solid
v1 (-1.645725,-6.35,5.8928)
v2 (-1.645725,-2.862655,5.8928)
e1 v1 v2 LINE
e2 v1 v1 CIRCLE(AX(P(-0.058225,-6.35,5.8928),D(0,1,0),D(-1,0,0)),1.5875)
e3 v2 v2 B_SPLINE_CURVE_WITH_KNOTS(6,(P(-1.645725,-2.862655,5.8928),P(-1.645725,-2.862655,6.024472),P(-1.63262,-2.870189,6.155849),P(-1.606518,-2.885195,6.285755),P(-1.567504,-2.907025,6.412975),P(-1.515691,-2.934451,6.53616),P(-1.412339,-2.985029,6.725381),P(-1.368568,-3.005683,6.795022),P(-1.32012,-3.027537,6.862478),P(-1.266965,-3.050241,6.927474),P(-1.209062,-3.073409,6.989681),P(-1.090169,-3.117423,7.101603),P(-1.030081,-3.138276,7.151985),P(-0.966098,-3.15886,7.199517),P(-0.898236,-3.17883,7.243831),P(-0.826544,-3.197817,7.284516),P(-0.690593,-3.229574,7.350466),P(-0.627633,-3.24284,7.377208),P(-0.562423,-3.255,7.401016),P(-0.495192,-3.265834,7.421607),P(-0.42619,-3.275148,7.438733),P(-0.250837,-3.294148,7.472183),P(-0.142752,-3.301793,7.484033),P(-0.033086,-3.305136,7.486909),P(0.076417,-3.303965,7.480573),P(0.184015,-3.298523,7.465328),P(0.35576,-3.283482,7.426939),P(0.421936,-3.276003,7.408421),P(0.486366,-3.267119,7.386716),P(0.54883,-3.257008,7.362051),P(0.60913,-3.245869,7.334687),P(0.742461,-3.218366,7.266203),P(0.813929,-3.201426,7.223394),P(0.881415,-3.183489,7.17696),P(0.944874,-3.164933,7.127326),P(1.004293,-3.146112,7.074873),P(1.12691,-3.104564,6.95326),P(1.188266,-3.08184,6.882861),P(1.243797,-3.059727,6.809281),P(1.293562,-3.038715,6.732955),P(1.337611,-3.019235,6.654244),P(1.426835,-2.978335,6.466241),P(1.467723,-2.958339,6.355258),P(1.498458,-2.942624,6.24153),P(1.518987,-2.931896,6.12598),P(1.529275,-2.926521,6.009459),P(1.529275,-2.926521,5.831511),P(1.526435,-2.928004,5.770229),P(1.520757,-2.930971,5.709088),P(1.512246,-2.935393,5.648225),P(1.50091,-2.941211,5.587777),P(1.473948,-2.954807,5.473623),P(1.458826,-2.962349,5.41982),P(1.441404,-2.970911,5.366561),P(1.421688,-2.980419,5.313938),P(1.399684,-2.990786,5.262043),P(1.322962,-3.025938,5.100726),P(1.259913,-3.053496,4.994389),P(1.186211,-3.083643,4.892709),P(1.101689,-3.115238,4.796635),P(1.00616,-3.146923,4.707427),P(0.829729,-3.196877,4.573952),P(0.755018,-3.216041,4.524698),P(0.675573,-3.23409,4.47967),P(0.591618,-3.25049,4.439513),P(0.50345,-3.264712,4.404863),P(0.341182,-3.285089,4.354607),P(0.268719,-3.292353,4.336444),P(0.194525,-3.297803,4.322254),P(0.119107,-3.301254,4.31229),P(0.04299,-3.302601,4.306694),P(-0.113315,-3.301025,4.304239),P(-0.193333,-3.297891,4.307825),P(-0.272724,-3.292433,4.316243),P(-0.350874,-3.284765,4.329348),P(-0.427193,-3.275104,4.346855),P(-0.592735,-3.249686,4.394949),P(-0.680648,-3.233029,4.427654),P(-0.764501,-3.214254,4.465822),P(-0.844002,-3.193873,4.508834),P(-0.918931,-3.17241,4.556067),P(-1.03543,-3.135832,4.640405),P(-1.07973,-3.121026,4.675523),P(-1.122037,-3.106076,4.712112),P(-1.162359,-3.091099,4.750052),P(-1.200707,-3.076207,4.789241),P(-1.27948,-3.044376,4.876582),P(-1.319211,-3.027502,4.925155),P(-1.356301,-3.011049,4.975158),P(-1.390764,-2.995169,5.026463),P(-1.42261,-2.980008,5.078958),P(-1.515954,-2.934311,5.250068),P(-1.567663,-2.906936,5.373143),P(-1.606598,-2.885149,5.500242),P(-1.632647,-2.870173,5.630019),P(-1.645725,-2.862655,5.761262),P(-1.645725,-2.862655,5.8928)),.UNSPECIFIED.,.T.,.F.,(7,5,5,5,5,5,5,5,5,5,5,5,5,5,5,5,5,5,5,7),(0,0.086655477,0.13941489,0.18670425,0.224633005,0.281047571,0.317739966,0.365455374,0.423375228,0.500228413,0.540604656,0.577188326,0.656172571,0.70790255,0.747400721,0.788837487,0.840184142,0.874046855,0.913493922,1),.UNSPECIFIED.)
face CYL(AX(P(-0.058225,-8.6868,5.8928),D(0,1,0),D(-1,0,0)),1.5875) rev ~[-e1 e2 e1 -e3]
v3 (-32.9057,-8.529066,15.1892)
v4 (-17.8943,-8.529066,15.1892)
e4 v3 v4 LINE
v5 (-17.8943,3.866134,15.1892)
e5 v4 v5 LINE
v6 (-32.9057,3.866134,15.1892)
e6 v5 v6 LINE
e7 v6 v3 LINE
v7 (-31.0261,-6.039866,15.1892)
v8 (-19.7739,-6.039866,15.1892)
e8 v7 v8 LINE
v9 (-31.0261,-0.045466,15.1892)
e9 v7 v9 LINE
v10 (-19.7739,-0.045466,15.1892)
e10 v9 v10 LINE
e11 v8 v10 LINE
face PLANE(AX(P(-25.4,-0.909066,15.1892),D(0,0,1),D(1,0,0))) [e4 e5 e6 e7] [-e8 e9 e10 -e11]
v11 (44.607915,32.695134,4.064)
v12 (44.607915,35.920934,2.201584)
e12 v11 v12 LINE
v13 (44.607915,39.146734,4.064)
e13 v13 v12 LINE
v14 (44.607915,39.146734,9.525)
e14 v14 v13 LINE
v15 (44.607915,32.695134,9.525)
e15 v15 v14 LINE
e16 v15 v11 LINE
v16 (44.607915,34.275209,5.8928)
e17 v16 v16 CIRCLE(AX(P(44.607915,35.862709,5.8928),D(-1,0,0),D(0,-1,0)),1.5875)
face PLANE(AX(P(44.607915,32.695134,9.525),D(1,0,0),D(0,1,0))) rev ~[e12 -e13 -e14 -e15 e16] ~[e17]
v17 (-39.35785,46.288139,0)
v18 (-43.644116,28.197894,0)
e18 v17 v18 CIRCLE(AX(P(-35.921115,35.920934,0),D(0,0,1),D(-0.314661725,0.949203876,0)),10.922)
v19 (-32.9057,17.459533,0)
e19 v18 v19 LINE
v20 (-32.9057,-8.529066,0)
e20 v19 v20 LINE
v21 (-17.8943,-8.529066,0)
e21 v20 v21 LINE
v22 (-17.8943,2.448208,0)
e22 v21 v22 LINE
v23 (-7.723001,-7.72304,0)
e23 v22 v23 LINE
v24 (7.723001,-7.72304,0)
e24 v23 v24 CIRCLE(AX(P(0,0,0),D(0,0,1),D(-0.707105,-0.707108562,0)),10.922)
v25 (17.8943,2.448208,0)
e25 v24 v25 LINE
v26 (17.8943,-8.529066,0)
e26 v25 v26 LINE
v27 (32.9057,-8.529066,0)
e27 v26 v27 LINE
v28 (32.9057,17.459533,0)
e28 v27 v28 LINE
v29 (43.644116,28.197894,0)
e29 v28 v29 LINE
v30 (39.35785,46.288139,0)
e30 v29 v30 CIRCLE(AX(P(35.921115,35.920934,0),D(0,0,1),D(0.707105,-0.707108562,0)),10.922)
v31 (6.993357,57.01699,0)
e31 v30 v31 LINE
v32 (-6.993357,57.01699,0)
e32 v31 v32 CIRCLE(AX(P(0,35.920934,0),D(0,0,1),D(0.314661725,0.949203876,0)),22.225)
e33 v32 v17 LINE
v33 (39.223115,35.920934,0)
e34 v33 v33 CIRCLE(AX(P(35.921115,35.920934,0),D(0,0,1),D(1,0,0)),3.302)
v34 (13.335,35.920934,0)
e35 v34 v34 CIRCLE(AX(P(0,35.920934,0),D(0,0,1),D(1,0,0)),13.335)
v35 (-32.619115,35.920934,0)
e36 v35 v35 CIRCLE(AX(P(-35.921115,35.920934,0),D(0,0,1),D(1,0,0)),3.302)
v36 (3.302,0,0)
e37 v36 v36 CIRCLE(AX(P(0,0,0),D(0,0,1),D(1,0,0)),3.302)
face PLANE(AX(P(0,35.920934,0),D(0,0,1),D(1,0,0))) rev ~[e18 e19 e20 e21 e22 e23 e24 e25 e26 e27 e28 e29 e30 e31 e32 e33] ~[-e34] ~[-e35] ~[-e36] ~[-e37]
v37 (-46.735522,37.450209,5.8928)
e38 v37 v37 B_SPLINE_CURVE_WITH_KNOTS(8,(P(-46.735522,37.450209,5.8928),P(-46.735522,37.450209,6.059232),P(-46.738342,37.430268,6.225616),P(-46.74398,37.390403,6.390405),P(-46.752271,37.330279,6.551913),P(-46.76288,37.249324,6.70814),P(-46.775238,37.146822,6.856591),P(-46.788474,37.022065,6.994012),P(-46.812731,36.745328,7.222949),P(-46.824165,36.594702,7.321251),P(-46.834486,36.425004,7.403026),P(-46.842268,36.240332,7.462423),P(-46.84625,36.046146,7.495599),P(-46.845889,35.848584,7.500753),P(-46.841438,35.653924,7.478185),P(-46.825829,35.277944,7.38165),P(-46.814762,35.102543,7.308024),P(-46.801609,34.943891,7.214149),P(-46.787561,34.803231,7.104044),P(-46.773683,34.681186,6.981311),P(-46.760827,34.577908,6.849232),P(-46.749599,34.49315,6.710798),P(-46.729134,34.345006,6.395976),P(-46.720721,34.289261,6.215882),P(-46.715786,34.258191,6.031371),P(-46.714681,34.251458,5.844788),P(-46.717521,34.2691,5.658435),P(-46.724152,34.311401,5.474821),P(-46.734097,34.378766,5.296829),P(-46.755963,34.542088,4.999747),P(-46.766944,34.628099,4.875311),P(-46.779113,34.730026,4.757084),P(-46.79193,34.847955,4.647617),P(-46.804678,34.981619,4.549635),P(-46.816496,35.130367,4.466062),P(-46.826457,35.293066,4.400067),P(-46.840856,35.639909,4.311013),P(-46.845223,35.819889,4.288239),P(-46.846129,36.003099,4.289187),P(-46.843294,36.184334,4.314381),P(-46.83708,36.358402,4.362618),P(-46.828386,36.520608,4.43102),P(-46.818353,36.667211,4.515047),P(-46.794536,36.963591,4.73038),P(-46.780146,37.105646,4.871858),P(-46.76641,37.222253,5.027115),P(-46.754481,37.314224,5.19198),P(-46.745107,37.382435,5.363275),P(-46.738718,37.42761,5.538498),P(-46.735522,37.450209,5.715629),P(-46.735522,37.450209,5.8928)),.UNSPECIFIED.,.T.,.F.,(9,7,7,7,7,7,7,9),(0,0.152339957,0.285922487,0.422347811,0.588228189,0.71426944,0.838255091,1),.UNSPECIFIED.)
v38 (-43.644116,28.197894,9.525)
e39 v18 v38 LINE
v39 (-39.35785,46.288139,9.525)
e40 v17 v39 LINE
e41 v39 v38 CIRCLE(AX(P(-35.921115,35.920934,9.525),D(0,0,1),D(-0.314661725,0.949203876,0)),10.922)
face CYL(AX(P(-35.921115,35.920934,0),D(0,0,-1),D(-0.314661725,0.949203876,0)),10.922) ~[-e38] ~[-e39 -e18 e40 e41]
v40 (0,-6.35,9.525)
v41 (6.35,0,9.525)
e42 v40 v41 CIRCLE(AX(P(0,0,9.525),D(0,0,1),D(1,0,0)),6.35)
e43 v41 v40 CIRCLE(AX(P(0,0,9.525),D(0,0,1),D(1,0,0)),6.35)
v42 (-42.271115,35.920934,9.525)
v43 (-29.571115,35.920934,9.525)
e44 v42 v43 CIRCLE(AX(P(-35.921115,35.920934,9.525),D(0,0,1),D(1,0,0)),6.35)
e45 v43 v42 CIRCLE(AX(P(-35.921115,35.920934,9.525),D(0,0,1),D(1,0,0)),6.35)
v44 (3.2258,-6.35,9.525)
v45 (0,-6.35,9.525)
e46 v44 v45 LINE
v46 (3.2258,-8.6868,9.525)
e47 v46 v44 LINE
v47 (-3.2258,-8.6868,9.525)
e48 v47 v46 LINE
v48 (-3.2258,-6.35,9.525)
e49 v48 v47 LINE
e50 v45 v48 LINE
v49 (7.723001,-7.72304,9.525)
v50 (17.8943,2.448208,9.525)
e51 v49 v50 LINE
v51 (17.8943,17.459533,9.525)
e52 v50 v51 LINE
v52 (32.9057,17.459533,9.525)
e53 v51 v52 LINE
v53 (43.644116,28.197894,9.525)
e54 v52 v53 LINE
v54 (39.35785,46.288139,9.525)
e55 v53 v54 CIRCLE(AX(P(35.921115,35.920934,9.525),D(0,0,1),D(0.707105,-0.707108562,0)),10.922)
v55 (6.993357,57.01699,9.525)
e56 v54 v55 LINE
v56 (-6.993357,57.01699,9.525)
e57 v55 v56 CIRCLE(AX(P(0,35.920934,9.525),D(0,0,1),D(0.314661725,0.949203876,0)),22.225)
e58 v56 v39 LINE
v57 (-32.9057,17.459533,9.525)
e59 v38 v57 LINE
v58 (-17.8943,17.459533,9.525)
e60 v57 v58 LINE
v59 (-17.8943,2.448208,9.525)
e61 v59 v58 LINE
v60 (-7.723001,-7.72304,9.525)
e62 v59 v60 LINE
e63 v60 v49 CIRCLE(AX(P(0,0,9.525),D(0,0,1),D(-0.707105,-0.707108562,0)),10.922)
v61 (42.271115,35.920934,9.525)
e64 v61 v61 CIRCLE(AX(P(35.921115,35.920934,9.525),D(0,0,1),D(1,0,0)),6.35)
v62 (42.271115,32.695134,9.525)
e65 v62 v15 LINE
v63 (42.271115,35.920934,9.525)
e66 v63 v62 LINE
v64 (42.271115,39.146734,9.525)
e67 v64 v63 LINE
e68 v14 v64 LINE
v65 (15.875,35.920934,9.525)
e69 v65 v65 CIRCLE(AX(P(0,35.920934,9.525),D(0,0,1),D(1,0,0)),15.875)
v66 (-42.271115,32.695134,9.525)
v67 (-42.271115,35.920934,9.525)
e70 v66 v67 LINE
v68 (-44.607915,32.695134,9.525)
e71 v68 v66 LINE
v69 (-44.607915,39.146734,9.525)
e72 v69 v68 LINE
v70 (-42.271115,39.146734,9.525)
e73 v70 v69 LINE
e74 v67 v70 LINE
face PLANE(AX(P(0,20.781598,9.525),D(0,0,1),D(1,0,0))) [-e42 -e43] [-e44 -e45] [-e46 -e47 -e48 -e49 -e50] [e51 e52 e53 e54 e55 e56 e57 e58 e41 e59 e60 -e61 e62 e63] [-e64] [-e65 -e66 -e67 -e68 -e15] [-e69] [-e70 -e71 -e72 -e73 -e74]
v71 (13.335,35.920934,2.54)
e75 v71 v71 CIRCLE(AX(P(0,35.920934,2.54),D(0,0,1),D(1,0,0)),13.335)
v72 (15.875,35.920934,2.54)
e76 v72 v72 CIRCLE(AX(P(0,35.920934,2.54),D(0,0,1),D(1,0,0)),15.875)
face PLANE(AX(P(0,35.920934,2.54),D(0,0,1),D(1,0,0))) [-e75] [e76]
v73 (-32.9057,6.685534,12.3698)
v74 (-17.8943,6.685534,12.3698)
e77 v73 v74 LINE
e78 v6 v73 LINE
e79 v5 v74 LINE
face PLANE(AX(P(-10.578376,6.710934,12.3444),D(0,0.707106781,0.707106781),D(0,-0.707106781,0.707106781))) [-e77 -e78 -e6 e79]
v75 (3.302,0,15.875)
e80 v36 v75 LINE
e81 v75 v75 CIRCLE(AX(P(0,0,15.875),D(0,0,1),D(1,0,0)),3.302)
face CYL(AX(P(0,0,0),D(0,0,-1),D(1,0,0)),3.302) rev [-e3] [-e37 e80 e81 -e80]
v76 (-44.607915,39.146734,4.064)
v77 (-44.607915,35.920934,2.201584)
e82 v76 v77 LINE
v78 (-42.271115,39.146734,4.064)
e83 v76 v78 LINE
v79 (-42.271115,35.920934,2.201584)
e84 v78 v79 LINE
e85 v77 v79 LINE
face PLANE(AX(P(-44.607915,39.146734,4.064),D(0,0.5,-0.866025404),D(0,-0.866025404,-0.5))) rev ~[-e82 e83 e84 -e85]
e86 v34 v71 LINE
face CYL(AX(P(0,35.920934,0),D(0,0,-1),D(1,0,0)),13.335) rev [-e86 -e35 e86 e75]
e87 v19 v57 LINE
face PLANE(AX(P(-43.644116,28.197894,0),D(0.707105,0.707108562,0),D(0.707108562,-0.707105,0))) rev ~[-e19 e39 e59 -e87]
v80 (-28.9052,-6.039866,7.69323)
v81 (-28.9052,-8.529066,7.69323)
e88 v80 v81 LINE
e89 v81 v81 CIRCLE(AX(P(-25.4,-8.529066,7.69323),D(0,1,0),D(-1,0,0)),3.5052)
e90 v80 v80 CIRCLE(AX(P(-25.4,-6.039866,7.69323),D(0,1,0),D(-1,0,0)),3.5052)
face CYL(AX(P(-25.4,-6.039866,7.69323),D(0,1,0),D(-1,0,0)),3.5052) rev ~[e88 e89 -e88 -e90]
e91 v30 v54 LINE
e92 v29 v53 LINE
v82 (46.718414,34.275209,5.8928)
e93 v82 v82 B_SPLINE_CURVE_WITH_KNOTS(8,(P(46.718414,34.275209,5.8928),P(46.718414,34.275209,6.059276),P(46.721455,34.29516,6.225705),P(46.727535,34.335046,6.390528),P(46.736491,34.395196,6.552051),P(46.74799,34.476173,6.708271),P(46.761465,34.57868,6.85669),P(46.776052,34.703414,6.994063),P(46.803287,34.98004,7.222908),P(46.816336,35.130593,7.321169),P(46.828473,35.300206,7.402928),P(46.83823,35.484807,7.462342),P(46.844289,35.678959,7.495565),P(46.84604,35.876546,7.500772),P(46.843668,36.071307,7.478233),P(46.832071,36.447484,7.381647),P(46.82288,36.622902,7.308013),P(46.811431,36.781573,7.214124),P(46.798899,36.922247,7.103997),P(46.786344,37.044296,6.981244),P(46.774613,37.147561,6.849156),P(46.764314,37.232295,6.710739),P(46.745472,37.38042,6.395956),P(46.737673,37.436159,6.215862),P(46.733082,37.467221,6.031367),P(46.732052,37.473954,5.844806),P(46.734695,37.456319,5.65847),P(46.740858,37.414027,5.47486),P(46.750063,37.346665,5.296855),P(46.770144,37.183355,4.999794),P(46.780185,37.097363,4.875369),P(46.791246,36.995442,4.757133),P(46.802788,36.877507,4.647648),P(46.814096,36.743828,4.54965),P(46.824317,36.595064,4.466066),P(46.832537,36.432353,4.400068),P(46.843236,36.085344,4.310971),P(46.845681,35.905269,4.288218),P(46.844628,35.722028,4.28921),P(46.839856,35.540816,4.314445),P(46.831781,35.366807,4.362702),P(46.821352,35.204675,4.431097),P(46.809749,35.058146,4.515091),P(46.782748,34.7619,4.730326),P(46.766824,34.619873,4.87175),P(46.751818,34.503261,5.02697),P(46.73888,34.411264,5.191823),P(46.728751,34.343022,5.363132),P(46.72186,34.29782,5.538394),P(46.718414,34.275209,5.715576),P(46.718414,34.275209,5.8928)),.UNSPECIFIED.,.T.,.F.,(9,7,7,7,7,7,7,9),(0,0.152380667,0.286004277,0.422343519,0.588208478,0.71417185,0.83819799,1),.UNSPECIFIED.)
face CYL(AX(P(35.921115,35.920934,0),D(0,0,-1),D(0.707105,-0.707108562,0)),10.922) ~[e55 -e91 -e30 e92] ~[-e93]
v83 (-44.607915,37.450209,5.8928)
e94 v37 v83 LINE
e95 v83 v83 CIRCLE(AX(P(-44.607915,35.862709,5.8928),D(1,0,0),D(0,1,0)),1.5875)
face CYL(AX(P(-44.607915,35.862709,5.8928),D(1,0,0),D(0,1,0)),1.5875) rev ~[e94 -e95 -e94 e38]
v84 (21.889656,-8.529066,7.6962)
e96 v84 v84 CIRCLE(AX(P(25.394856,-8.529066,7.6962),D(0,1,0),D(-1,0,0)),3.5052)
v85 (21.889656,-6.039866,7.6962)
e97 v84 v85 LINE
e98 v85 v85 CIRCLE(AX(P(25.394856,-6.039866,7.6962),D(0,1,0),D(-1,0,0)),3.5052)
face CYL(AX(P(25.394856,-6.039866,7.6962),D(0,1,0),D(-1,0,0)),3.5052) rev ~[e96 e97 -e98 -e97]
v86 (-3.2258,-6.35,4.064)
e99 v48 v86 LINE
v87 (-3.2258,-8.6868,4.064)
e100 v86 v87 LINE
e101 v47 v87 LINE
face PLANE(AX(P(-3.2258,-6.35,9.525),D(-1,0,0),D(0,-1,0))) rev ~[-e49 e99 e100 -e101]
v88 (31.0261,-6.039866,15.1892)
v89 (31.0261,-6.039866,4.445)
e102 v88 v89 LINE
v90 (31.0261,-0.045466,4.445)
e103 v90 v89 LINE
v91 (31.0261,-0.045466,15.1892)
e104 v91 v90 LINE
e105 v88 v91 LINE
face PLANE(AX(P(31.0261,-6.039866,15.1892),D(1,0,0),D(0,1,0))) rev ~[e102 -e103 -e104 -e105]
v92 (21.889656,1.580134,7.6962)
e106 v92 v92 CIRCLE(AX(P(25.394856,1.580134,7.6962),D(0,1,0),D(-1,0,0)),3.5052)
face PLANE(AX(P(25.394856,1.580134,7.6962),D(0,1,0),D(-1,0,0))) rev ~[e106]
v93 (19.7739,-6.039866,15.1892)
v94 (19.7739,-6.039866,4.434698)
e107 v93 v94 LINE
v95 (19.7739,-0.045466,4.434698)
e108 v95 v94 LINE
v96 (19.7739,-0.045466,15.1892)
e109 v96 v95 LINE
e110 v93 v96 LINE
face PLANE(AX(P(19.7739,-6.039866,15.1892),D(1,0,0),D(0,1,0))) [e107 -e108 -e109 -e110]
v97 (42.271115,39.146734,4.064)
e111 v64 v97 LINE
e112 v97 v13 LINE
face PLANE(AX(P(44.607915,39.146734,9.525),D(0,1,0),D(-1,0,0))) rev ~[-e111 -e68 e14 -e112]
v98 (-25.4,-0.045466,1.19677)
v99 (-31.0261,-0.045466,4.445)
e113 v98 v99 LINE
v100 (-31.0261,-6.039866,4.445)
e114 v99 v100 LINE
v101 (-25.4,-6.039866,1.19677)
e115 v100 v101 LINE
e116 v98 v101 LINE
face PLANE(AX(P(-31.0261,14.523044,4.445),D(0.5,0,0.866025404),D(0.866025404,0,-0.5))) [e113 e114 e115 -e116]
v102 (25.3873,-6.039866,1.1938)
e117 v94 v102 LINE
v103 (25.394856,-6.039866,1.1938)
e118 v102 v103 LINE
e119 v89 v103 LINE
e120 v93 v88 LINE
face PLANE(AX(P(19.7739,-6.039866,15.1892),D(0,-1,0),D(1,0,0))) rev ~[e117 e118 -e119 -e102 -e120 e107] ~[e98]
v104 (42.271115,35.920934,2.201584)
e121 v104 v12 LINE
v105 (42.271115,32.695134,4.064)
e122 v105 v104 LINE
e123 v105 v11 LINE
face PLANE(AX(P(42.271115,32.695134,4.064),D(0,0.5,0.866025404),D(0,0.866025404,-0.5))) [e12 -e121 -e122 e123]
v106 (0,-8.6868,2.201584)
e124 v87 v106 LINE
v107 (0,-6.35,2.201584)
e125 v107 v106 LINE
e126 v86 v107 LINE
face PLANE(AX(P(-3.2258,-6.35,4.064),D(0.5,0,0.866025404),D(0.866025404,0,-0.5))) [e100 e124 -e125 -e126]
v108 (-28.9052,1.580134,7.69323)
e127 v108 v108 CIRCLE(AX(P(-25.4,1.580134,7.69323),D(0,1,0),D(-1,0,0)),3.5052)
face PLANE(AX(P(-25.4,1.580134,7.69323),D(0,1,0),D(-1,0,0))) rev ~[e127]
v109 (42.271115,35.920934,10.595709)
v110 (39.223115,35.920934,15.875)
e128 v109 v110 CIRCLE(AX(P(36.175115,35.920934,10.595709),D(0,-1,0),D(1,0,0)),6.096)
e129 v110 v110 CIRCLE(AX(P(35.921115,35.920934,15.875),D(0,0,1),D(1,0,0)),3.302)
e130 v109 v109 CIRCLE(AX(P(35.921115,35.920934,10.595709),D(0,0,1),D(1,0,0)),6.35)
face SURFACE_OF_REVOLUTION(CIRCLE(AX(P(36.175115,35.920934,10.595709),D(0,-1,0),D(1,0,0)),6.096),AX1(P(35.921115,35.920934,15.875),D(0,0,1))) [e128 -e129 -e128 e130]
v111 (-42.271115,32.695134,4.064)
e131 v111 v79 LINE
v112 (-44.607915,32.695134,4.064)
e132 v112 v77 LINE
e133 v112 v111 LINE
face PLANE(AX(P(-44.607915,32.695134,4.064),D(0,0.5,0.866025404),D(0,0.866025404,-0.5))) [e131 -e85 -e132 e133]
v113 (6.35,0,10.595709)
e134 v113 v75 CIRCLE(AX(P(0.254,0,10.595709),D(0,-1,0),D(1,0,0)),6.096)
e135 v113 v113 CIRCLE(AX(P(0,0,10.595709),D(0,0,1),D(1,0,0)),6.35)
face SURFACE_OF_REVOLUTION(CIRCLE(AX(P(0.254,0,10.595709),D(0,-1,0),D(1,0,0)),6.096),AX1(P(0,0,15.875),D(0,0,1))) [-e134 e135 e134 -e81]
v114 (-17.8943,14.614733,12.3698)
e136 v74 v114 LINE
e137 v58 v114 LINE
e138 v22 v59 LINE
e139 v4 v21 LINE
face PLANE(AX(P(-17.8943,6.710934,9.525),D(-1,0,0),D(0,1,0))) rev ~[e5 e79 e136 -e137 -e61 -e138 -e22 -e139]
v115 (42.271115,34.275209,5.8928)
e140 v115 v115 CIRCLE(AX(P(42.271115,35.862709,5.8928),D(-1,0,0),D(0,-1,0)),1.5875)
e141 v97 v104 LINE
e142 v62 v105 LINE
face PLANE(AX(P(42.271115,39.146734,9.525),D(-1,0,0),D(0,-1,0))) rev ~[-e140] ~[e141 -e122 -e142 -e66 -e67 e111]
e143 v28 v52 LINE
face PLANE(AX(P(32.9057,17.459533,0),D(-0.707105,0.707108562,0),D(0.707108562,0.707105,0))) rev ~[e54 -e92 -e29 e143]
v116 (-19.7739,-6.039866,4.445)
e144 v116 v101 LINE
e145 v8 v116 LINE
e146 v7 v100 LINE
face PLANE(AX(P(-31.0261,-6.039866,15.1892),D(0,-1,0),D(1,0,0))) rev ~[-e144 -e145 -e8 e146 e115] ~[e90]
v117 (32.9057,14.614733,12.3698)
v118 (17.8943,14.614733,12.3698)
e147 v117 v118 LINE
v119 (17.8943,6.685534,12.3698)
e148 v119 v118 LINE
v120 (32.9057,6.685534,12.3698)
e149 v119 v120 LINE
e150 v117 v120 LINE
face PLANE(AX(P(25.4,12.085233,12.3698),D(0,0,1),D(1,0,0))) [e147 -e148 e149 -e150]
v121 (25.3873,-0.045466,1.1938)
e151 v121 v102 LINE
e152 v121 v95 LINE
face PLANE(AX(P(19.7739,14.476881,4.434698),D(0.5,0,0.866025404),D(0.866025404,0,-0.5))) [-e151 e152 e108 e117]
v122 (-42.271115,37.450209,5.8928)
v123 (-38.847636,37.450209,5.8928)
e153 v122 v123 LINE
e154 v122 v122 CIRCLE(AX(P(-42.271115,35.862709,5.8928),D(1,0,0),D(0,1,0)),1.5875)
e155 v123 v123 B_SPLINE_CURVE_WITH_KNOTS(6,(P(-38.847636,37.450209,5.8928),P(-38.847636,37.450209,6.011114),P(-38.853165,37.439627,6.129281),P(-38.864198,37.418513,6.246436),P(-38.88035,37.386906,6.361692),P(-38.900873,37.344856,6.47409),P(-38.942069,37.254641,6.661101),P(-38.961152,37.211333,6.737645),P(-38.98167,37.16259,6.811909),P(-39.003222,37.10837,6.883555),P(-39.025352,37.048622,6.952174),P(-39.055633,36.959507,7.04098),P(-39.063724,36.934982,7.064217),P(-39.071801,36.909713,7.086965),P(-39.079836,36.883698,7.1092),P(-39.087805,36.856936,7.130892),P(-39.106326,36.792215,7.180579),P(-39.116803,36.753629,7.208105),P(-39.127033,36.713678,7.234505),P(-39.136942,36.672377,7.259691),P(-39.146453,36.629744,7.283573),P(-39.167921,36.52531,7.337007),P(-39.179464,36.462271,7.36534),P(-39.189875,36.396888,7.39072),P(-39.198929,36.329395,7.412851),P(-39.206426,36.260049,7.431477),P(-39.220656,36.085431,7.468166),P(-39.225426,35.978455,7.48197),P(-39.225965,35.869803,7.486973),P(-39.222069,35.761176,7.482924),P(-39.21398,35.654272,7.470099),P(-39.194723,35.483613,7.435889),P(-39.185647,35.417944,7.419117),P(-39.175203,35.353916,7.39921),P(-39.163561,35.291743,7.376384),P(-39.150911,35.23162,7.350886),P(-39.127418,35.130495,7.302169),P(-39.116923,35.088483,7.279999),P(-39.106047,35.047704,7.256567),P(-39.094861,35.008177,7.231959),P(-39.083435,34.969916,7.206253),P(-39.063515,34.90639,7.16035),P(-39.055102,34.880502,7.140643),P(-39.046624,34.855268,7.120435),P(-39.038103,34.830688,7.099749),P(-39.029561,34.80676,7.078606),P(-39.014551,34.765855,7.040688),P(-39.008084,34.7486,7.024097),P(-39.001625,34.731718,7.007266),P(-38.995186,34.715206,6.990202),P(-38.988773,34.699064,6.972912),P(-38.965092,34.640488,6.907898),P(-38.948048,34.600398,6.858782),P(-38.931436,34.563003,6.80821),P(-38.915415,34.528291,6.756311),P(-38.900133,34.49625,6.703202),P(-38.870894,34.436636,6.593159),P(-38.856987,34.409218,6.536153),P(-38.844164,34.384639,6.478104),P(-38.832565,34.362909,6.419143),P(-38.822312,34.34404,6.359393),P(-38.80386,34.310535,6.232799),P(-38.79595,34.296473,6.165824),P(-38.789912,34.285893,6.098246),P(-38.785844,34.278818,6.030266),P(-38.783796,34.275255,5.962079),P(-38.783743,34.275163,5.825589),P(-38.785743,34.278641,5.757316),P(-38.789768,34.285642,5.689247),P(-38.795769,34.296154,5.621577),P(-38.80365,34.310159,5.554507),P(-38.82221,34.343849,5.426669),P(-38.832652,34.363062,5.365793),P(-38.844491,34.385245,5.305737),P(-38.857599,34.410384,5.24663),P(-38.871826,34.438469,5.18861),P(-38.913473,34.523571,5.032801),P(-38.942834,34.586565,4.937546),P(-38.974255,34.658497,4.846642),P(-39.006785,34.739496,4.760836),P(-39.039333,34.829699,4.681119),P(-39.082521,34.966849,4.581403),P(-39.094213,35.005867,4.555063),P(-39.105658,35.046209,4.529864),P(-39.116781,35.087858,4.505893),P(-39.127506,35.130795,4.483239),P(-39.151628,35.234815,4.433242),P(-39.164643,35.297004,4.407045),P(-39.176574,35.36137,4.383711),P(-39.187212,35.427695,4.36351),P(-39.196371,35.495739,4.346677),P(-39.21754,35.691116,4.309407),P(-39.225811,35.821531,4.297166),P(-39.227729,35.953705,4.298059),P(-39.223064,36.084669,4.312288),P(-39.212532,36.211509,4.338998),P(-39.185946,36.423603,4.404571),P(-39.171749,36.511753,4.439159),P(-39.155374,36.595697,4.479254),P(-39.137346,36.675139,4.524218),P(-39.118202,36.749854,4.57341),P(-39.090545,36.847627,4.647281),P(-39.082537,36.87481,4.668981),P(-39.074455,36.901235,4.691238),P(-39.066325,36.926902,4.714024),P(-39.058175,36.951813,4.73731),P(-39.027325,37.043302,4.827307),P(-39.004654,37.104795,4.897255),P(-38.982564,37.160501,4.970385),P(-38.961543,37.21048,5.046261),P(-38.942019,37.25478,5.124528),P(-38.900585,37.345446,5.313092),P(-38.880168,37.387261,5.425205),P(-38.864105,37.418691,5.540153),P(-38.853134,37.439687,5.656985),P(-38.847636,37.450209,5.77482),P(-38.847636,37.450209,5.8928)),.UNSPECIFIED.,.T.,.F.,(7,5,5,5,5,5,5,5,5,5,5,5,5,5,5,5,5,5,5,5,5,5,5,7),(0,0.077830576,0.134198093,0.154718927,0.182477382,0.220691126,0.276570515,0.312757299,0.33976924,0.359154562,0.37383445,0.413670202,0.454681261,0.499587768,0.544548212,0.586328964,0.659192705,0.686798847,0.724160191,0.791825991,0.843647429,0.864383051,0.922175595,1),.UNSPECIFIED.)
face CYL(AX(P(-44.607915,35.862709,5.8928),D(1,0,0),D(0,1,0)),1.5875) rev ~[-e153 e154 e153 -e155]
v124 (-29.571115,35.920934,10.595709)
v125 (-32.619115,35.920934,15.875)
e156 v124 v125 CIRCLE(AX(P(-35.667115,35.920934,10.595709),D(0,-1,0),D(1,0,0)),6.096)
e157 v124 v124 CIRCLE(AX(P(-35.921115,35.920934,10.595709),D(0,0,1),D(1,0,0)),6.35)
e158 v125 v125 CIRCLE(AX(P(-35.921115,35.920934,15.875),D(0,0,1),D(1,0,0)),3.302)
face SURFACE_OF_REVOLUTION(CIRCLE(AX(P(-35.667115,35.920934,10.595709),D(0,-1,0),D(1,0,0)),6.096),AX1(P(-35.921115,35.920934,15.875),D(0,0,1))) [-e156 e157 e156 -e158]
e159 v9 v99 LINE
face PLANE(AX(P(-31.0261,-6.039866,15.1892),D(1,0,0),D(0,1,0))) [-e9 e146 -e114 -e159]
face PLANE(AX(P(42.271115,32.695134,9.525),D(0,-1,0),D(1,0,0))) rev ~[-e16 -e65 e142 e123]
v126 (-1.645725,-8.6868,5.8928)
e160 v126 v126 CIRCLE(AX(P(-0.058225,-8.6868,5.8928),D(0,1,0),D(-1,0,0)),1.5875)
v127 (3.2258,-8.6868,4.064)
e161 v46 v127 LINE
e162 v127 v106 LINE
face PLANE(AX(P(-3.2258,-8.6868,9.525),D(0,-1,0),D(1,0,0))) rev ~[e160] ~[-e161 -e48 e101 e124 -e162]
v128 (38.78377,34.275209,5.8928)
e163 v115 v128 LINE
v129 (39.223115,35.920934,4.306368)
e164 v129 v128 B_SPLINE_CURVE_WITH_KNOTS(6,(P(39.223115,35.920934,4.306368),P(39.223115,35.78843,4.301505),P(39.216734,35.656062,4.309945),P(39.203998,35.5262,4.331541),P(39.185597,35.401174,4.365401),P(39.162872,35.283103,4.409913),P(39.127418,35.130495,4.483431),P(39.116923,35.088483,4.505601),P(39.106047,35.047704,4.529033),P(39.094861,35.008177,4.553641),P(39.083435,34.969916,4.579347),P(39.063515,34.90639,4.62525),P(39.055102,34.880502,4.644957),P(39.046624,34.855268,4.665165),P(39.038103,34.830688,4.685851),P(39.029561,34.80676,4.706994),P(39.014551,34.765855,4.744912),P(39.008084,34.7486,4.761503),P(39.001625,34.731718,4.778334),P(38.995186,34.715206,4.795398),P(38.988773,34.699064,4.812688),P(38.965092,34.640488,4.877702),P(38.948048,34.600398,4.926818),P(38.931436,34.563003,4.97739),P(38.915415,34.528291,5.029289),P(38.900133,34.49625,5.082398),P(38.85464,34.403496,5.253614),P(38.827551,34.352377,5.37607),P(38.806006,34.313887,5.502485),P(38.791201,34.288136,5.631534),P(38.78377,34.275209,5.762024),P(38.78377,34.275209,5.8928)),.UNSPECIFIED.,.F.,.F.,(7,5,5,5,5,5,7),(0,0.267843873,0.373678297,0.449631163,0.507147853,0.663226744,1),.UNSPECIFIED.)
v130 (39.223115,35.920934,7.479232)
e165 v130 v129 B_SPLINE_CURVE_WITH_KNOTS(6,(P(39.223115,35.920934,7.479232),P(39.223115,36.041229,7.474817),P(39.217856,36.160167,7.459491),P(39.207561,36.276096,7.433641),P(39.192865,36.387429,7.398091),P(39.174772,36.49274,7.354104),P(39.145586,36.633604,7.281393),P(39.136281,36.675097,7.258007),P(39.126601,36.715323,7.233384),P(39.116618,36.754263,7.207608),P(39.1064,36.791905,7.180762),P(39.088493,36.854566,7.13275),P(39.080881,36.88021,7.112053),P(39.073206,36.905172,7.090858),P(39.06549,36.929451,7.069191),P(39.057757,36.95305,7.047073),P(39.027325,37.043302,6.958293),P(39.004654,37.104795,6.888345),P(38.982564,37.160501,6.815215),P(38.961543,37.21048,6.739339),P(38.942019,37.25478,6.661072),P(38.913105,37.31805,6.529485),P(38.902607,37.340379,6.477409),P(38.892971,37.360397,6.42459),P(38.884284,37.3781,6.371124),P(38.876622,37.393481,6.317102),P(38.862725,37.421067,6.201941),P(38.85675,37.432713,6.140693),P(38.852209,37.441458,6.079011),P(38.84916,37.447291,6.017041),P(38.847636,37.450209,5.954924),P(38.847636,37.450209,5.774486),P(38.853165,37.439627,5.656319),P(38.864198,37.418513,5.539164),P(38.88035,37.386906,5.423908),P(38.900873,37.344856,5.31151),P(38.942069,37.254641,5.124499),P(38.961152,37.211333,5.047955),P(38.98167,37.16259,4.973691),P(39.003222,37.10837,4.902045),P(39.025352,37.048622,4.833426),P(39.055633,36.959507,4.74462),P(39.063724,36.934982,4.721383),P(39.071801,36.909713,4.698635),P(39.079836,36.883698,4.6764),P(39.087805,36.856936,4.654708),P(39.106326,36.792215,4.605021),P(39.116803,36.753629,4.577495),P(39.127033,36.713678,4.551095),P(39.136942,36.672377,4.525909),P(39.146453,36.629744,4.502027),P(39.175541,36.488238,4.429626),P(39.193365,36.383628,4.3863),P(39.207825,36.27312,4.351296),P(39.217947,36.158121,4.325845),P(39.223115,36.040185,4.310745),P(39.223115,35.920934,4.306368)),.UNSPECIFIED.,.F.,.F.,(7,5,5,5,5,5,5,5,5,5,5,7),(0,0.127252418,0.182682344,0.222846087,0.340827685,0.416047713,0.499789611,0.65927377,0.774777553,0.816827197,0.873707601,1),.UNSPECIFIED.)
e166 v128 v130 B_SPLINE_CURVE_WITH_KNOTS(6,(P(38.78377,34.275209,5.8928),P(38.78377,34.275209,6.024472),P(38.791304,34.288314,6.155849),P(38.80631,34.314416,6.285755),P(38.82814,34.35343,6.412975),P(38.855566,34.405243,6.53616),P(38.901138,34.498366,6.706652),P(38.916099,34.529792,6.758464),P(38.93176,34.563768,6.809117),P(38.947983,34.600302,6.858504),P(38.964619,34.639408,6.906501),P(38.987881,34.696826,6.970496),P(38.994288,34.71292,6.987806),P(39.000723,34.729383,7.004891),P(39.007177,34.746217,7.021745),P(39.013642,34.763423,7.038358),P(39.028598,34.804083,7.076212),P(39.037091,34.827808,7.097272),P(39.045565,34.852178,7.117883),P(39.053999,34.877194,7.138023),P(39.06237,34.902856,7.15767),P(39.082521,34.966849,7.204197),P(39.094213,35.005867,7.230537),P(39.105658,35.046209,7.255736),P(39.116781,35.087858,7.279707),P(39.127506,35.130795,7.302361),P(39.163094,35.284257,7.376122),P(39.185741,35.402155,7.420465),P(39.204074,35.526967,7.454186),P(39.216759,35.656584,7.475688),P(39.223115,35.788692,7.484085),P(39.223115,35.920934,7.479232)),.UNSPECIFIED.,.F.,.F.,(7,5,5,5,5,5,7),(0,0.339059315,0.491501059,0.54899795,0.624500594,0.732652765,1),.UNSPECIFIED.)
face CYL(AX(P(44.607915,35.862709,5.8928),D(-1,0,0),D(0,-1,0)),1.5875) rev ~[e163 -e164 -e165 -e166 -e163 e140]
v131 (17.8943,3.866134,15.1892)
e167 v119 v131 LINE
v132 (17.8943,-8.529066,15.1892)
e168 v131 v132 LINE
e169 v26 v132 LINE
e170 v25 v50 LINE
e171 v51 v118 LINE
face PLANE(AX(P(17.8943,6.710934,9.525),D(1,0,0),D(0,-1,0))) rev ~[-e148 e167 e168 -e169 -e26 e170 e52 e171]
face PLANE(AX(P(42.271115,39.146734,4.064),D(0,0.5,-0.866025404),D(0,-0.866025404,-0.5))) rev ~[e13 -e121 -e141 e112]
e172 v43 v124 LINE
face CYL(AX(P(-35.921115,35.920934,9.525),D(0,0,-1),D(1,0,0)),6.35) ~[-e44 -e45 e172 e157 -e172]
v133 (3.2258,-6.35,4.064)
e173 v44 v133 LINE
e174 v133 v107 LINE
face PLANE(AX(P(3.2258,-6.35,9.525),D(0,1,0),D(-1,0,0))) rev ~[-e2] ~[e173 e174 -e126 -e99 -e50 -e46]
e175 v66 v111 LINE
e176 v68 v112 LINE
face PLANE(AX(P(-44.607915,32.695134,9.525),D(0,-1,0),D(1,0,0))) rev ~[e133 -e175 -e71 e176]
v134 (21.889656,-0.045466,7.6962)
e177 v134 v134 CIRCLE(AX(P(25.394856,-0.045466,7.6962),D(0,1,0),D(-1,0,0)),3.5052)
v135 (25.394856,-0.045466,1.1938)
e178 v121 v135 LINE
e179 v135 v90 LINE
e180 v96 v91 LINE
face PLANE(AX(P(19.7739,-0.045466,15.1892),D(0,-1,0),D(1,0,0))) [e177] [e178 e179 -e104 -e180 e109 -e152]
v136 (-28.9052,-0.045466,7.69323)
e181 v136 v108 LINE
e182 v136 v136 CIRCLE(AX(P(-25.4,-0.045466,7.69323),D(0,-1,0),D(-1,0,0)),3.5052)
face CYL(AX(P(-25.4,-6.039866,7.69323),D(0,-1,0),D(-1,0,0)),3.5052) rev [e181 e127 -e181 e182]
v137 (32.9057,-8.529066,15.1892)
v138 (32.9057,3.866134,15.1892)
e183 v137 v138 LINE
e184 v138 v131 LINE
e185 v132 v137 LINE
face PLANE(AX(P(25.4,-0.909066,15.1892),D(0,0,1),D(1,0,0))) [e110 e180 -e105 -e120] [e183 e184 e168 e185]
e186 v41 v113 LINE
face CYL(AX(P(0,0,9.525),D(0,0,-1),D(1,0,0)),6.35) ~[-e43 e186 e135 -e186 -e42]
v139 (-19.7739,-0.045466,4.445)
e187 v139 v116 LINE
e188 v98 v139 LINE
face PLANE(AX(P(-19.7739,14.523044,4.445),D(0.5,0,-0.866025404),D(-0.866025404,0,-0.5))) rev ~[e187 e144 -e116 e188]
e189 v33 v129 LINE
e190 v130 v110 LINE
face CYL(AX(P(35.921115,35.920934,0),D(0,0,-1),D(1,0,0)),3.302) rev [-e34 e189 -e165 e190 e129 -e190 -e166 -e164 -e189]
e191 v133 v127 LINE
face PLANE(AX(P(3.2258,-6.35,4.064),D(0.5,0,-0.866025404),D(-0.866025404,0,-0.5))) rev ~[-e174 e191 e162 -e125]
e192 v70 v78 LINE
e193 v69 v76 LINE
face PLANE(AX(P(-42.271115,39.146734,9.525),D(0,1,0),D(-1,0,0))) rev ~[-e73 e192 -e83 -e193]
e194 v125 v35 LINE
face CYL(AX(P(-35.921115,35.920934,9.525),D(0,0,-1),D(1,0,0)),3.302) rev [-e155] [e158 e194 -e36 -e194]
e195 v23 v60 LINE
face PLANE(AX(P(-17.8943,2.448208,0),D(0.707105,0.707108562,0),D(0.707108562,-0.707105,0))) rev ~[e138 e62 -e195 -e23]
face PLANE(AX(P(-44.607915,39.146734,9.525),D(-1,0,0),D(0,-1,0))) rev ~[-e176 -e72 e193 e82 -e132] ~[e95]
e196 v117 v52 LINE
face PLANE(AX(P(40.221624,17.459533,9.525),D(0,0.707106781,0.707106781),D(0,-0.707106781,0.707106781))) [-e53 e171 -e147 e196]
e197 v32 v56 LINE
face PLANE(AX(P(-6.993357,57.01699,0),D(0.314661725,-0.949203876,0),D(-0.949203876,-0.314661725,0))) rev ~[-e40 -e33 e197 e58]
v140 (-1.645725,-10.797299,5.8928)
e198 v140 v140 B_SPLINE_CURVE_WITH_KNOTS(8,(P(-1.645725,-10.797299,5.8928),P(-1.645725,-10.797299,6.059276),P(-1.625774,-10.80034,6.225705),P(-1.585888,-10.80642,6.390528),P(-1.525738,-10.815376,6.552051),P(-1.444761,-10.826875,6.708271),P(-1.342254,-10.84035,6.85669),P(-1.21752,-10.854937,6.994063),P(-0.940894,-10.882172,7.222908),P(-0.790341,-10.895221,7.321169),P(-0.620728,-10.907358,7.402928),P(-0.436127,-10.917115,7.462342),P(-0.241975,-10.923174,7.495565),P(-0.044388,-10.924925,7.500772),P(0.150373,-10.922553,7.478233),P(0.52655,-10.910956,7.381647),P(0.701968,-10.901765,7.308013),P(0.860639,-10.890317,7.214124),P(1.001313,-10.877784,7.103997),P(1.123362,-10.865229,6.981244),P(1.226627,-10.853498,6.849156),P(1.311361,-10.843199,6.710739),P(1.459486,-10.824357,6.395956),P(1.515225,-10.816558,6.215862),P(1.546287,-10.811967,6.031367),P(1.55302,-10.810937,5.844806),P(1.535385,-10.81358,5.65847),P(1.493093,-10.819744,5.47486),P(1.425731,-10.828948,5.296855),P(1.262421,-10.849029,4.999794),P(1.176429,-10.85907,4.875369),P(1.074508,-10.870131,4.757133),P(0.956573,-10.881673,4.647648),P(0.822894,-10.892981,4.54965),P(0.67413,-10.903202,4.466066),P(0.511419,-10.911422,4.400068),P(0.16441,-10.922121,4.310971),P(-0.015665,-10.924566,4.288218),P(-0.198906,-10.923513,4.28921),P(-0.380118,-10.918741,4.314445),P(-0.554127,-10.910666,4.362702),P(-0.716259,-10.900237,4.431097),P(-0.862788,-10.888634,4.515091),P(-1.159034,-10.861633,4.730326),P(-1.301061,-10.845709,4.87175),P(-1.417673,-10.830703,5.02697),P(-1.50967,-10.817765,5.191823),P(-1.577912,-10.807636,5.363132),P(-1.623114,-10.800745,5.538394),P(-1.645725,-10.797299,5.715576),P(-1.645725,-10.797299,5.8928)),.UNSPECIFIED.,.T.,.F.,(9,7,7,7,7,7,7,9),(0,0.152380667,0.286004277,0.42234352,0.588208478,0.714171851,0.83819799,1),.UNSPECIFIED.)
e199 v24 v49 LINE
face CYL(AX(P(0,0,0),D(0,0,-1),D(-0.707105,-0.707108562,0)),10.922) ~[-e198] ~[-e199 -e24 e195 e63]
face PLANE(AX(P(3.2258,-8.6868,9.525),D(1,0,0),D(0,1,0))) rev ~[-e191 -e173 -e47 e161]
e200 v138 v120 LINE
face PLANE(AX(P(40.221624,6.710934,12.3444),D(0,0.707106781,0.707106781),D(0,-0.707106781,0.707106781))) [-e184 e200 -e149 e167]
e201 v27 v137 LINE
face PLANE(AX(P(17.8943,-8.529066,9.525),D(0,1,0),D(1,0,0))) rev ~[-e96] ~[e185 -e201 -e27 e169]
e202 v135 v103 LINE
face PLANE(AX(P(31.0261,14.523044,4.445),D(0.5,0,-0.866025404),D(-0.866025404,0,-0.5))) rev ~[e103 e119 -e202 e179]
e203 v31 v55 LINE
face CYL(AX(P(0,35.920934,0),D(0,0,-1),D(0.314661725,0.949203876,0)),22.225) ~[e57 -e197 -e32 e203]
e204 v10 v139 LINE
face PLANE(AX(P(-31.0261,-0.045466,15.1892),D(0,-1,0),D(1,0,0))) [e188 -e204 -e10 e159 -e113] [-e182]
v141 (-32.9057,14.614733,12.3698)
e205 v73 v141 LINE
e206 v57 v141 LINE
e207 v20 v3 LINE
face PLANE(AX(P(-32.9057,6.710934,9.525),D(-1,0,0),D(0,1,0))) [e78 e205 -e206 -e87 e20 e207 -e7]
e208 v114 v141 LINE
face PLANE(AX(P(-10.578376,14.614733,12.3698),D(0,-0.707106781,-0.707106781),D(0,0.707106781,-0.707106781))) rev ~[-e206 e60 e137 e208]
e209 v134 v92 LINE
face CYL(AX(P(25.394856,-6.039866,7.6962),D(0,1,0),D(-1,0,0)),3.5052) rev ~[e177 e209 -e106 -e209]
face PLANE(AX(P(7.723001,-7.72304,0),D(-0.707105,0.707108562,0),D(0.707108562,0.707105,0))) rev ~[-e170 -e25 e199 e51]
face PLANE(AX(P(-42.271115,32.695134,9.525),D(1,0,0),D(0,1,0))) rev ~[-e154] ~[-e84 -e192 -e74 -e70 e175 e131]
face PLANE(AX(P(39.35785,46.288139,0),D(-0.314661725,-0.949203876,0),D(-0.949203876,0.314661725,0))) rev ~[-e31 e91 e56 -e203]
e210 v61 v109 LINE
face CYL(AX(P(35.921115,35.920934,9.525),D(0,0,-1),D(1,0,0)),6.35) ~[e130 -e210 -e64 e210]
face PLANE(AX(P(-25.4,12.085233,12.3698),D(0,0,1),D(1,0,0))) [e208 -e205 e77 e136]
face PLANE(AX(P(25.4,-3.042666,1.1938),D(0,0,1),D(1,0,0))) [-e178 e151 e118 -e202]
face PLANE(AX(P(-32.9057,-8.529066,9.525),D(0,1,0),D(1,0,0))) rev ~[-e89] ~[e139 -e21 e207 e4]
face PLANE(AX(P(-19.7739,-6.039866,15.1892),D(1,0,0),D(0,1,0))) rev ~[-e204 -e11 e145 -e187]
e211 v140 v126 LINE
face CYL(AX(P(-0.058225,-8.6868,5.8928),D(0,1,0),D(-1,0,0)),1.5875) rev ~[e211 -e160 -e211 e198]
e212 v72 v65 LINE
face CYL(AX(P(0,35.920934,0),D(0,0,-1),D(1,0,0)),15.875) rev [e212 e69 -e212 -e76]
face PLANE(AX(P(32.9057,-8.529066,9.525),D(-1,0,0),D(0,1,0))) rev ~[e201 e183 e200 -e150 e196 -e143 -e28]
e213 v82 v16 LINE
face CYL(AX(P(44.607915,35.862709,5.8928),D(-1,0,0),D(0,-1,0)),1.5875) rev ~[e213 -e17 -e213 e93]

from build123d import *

# Parameters (mm, degrees)
F0_R          = 3.302
F0_R_2        = 15.875
F1_DEPTH      = 9.525
F0_R_3        = 13.335
F2_DEPTH      = 2.54
F5_DEPTH      = 8.636
F6_T1_DEPTH   = 2.3368
F6_T3_DEPTH   = 2.3368
F6_T5_DEPTH   = 2.3368
F3_R          = 6.35
F3_R_2        = 3.302
F7_DEPTH      = 6.35
F11_R         = 1.5875
F12_DEPTH     = 6.35
F9_R          = 1.5875
F13_DEPTH     = 6.35
F10_R         = 1.5875
F14_DEPTH     = 8.382
F16_DEPTH     = 5.6642
F15_W         = 15.0114
F15_H         = 10.748598603
F17_DEPTH     = 2.8448
F18_T4_DEPTH  = 29.6432475283
F18_T9_DEPTH  = 29.6432475283
F18_T14_DEPTH = 29.6432475283
F18_T19_DEPTH = 29.6432475283
F19_W         = 11.2522
F19_H         = 5.9944
F20_DEPTH     = 13.9954
F21_T1_DEPTH  = 20.5629100612
F22_T1_DEPTH  = 20.5167471751
F23_R         = 3.5052
F24_R         = 3.5052
F25_DEPTH     = 7.62


# Not quite as in the source:
# - a fillet or chamfer that OpenCascade refuses, or shapes differently, is made with other operations: its cross-section is extruded or revolved along the edge and cut away or added
# - a feature names something its author has since deleted; it is built from what else it names


with BuildPart() as f1:
    # F0 (on Top) → F1 (new body)
    with BuildSketch(Plane.XY):
        with BuildLine():
            Line((39.3578503288, 46.2881387371), (6.9933568382, 57.0169901512))
            ThreePointArc((6.9933568382, 57.0169901512), (0, 58.145934), (-6.9933568382, 57.0169901512))
            Line((-6.9933568382, 57.0169901512), (-39.3578503288, 46.2881387371))
            ThreePointArc((-39.3578503288, 46.2881387371), (-46.548869386, 38.4390523526), (-43.6441157783, 28.1978942818))
            Line((-43.6441157783, 28.1978942818), (-32.9057, 17.459532603))
            Line((-32.9057, 17.459532603), (-32.9057, -8.529066))
            Line((-32.9057, -8.529066), (-17.8943, -8.529066))
            Line((-17.8943, -8.529066), (-17.8943, 2.4482082294))
            Line((-17.8943, 2.4482082294), (-7.72300081, -7.7230397182))
            ThreePointArc((-7.72300081, -7.7230397182), (0, -10.922), (7.72300081, -7.7230397182))
            Line((7.72300081, -7.7230397182), (17.8943, 2.4482082294))
            Line((17.8943, 2.4482082294), (17.8943, -8.529066))
            Line((17.8943, -8.529066), (32.9057, -8.529066))
            Line((32.9057, -8.529066), (32.9057, 17.459532603))
            Line((32.9057, 17.459532603), (43.6441157783, 28.1978942818))
            ThreePointArc((43.6441157783, 28.1978942818), (46.548869386, 38.4390523526), (39.3578503288, 46.2881387371))
        make_face()
        Circle(F0_R, mode=Mode.SUBTRACT)
        with Locations((-35.9211149683, 35.920934)):
            Circle(F0_R, mode=Mode.SUBTRACT)
        with Locations((0, 35.920934)):
            Circle(F0_R_2, mode=Mode.SUBTRACT)
        with Locations((35.9211149683, 35.920934)):
            Circle(F0_R, mode=Mode.SUBTRACT)
    extrude(amount=F1_DEPTH)

    # F0 (on Top) → F2 (join)
    with BuildSketch(Plane.XY):
        with Locations((0, 35.920934)):
            Circle(F0_R_2)
        with Locations((0, 35.920934)):
            Circle(F0_R_3, mode=Mode.SUBTRACT)
    extrude(amount=F2_DEPTH)

    # F4 (on face) → F5 (cut)
    with BuildSketch(Plane.XY.offset(9.525)):
        Polygon((-42.2711149683, 32.695134), (-42.2711149683, 35.920934), (-42.2711149683, 39.146734), (-44.6079149683, 39.146734), (-44.6079149683, 32.695134), align=None)
        Polygon((42.2711149683, 39.146734), (42.2711149683, 35.920934), (42.2711149683, 32.695134), (44.6079149683, 32.695134), (44.6079149683, 39.146734), align=None)
        Polygon((3.2258, -6.35), (0, -6.35), (-3.2258, -6.35), (-3.2258, -8.6868), (3.2258, -8.6868), align=None)
    extrude(amount=-F5_DEPTH, mode=Mode.SUBTRACT)

    # F6: chamfer of 3.175 x 5.499261314 on 6 edges, made by hand

    # F6_s2 → F6_t1 (join)
    with BuildSketch(Plane.YZ.offset(-44.6079149683)):
        Polygon((39.146734, 4.064), (33.647472686, 0.889), (39.146734, 0.889), align=None)
        Polygon((32.695134, 4.064), (38.194395314, 0.889), (32.695134, 0.889), align=None)
    extrude(amount=F6_T1_DEPTH)

    # F6_s4 → F6_t3 (join)
    with BuildSketch(Plane.XZ.offset(6.35)):
        Polygon((3.2258, 4.064), (-2.273461314, 0.889), (3.2258, 0.889), align=None)
        Polygon((-3.2258, 4.064), (2.273461314, 0.889), (-3.2258, 0.889), align=None)
    extrude(amount=F6_T3_DEPTH)

    # F6_s6 → F6_t5 (join)
    with BuildSketch(Plane.YZ.offset(42.2711149683)):
        Polygon((39.146734, 4.064), (33.647472686, 0.889), (39.146734, 0.889), align=None)
        Polygon((32.695134, 4.064), (38.194395314, 0.889), (32.695134, 0.889), align=None)
    extrude(amount=F6_T5_DEPTH)

    # F3 (on face) → F7 (join)
    with BuildSketch(Plane.XY.offset(9.525)):
        with Locations((-35.9211149683, 35.920934)):
            Circle(F3_R)
        with Locations((-35.9211149683, 35.920934)):
            Circle(F3_R_2, mode=Mode.SUBTRACT)
        Circle(F3_R)
        Circle(F3_R_2, mode=Mode.SUBTRACT)
        with Locations((35.9211149683, 35.920934)):
            Circle(F3_R)
        with Locations((35.9211149683, 35.920934)):
            Circle(F3_R_2, mode=Mode.SUBTRACT)
    extrude(amount=F7_DEPTH)

    # F8: fillet of radius 6.096 on 3 edges, made by hand

    # F8_s1 → F8_t2 (revolve, cut)
    with BuildSketch(Plane.XZ.offset(-35.920934)):
        with BuildLine():
            ThreePointArc((-29.5711149683, 10.5957091385), (-30.3878241069, 13.6437091385), (-32.6191149683, 15.875))
            Line((-32.6191149683, 15.875), (-29.5711149683, 15.875))
            Line((-29.5711149683, 15.875), (-29.5711149683, 10.5957091385))
        make_face()
    revolve(axis=Axis((-35.9211149683, 35.920934, 15.875), (0, 0, 1)), mode=Mode.SUBTRACT)

    # F8_s3 → F8_t4 (revolve, cut)
    with BuildSketch(Plane.XZ.offset(-35.920934)):
        with BuildLine():
            ThreePointArc((42.2711149683, 10.5957091385), (41.4544058298, 13.6437091385), (39.2231149683, 15.875))
            Line((39.2231149683, 15.875), (42.2711149683, 15.875))
            Line((42.2711149683, 15.875), (42.2711149683, 10.5957091385))
        make_face()
    revolve(axis=Axis((35.9211149683, 35.920934, 15.875), (0, 0, 1)), mode=Mode.SUBTRACT)

    # F8_s5 → F8_t6 (revolve, cut)
    with BuildSketch(Plane.XZ):
        with BuildLine():
            ThreePointArc((6.35, 10.5957091385), (5.5332908615, 13.6437091385), (3.302, 15.875))
            Line((3.302, 15.875), (6.35, 15.875))
            Line((6.35, 15.875), (6.35, 10.5957091385))
        make_face()
    revolve(axis=Axis((0, 0, 15.875), (0, 0, 1)), mode=Mode.SUBTRACT)

    # F11 (on face) → F12 (cut, symmetric)
    with BuildSketch(Plane(origin=(44.6079149683, 0, 0), x_dir=(0, -1, 0), z_dir=(-1, 0, 0))):
        with Locations((-35.8627085169, 5.8928)):
            Circle(F11_R)
    extrude(amount=F12_DEPTH, both=True, mode=Mode.SUBTRACT)

    # F9 (on face) → F13 (cut, symmetric)
    with BuildSketch(Plane.YZ.offset(-44.6079149683)):
        with Locations((35.8627085169, 5.8928)):
            Circle(F9_R)
    extrude(amount=F13_DEPTH, both=True, mode=Mode.SUBTRACT)

    # F10 (on face) → F14 (cut, symmetric)
    with BuildSketch(Plane(origin=(0, -8.6868, 0), x_dir=(-1, 0, 0), z_dir=(0, 1, 0))):
        with Locations((0.0582254831, 5.8928)):
            Circle(F10_R)
    extrude(amount=F14_DEPTH, both=True, mode=Mode.SUBTRACT)

    # F15 (on face) → F16 (join)
    with BuildSketch(Plane.XY.offset(9.525)):
        Polygon((17.8943, 6.710934), (17.8943, 2.4482082294), (17.8943, -8.529066), (32.9057, -8.529066), (32.9057, 6.710934), align=None)
        Polygon((-32.9057, -8.529066), (-17.8943, -8.529066), (-17.8943, 2.4482082294), (-17.8943, 6.710934), (-32.9057, 6.710934), align=None)
    extrude(amount=F16_DEPTH)

    # F15 (on face) → F17 (join)
    with BuildSketch(Plane.XY.offset(9.525)):
        with Locations((-25.4, 12.0852333015)):
            Rectangle(F15_W, F15_H)
        with Locations((25.4, 12.0852333015)):
            Rectangle(F15_W, F15_H)
    extrude(amount=F17_DEPTH)

    # F18: chamfer of 2.8448 on 4 edges, made by hand


with BuildPart() as f18_tool2:
    # F18_s3 → F18_t4 (new body)
    with BuildSketch(Plane.YZ.offset(-10.5783762358)):
        Polygon((14.614732603, 12.3698), (17.459532603, 9.525), (17.459532603, 12.3698), align=None)
    extrude(amount=-F18_T4_DEPTH)

    split(bisect_by=Plane.XY.offset(9.525), keep=Keep.TOP)


with BuildPart() as f1_1:
    add(f1.part)

    # F18_t1: cut F18_tool2
    add(f18_tool2.part, mode=Mode.SUBTRACT)


with BuildPart() as f18_tool7:
    # F18_s8 → F18_t9 (new body)
    with BuildSketch(Plane.YZ.offset(40.2216237642)):
        Polygon((17.459532603, 9.525), (14.614732603, 12.3698), (17.459532603, 12.3698), align=None)
    extrude(amount=-F18_T9_DEPTH)

    split(bisect_by=Plane.XY.offset(9.525), keep=Keep.TOP)


with BuildPart() as f1_2:
    add(f1_1.part)

    # F18_t6: cut F18_tool7
    add(f18_tool7.part, mode=Mode.SUBTRACT)


with BuildPart() as f18_tool12:
    # F18_s13 → F18_t14 (new body)
    with BuildSketch(Plane.YZ.offset(-10.5783762358)):
        Polygon((6.710934, 12.3444), (3.866134, 15.1892), (6.710934, 15.1892), align=None)
    extrude(amount=-F18_T14_DEPTH)

    split(bisect_by=Plane.XY.offset(12.3698), keep=Keep.TOP)


with BuildPart() as f1_3:
    add(f1_2.part)

    # F18_t11: cut F18_tool12
    add(f18_tool12.part, mode=Mode.SUBTRACT)


with BuildPart() as f18_tool17:
    # F18_s18 → F18_t19 (new body)
    with BuildSketch(Plane.YZ.offset(40.2216237642)):
        Polygon((6.710934, 12.3444), (3.866134, 15.1892), (6.710934, 15.1892), align=None)
    extrude(amount=-F18_T19_DEPTH)

    split(bisect_by=Plane.XY.offset(12.3698), keep=Keep.TOP)


with BuildPart() as f1_4:
    add(f1_3.part)

    # F18_t16: cut F18_tool17
    add(f18_tool17.part, mode=Mode.SUBTRACT)

    # F19 (on face) → F20 (cut)
    with BuildSketch(Plane.XY.offset(15.1892)):
        with Locations((-25.4, -3.042666)):
            Rectangle(F19_W, F19_H)
        with Locations((25.4, -3.042666)):
            Rectangle(F19_W, F19_H)
    extrude(amount=-F20_DEPTH, mode=Mode.SUBTRACT)

    # F21: chamfer of 3.2512 x 5.6312435856 on 3 edges, made by hand

    # F21_s2 → F21_t1 (join)
    with BuildSketch(Plane.XZ.offset(-14.5230440612)):
        Polygon((-19.7739, 4.445), (-25.4051435856, 1.1938), (-19.7739, 1.1938), align=None)
        Polygon((-31.0261, 4.445), (-25.3948564144, 1.1938), (-31.0261, 1.1938), align=None)
        Polygon((31.0261, 4.445), (25.3948564144, 1.1938), (31.0261, 1.1938), align=None)
    extrude(amount=F21_T1_DEPTH)

    # F22: chamfer of 5.6134 x 3.2408980011 on 1 edges, made by hand

    # F22_s2 → F22_t1 (join)
    with BuildSketch(Plane.XZ.offset(-14.4768811751)):
        Polygon((19.7739, 4.4346980011), (25.3873, 1.1938), (19.7739, 1.1938), align=None)
    extrude(amount=F22_T1_DEPTH)

    # F23 (on face) + F24 (on face) → F25 (cut, symmetric)
    with BuildSketch(Plane(origin=(0, -6.039866, 0), x_dir=(-1, 0, 0), z_dir=(0, 1, 0))):
        with Locations((25.4, 7.6932303495)):
            Circle(F23_R)
    with BuildSketch(Plane(origin=(0, -6.039866, 0), x_dir=(-1, 0, 0), z_dir=(0, 1, 0))):
        with Locations((-25.3948564144, 7.6962)):
            Circle(F24_R)
    extrude(amount=F25_DEPTH, both=True, mode=Mode.SUBTRACT)


solid = f1_4.part
